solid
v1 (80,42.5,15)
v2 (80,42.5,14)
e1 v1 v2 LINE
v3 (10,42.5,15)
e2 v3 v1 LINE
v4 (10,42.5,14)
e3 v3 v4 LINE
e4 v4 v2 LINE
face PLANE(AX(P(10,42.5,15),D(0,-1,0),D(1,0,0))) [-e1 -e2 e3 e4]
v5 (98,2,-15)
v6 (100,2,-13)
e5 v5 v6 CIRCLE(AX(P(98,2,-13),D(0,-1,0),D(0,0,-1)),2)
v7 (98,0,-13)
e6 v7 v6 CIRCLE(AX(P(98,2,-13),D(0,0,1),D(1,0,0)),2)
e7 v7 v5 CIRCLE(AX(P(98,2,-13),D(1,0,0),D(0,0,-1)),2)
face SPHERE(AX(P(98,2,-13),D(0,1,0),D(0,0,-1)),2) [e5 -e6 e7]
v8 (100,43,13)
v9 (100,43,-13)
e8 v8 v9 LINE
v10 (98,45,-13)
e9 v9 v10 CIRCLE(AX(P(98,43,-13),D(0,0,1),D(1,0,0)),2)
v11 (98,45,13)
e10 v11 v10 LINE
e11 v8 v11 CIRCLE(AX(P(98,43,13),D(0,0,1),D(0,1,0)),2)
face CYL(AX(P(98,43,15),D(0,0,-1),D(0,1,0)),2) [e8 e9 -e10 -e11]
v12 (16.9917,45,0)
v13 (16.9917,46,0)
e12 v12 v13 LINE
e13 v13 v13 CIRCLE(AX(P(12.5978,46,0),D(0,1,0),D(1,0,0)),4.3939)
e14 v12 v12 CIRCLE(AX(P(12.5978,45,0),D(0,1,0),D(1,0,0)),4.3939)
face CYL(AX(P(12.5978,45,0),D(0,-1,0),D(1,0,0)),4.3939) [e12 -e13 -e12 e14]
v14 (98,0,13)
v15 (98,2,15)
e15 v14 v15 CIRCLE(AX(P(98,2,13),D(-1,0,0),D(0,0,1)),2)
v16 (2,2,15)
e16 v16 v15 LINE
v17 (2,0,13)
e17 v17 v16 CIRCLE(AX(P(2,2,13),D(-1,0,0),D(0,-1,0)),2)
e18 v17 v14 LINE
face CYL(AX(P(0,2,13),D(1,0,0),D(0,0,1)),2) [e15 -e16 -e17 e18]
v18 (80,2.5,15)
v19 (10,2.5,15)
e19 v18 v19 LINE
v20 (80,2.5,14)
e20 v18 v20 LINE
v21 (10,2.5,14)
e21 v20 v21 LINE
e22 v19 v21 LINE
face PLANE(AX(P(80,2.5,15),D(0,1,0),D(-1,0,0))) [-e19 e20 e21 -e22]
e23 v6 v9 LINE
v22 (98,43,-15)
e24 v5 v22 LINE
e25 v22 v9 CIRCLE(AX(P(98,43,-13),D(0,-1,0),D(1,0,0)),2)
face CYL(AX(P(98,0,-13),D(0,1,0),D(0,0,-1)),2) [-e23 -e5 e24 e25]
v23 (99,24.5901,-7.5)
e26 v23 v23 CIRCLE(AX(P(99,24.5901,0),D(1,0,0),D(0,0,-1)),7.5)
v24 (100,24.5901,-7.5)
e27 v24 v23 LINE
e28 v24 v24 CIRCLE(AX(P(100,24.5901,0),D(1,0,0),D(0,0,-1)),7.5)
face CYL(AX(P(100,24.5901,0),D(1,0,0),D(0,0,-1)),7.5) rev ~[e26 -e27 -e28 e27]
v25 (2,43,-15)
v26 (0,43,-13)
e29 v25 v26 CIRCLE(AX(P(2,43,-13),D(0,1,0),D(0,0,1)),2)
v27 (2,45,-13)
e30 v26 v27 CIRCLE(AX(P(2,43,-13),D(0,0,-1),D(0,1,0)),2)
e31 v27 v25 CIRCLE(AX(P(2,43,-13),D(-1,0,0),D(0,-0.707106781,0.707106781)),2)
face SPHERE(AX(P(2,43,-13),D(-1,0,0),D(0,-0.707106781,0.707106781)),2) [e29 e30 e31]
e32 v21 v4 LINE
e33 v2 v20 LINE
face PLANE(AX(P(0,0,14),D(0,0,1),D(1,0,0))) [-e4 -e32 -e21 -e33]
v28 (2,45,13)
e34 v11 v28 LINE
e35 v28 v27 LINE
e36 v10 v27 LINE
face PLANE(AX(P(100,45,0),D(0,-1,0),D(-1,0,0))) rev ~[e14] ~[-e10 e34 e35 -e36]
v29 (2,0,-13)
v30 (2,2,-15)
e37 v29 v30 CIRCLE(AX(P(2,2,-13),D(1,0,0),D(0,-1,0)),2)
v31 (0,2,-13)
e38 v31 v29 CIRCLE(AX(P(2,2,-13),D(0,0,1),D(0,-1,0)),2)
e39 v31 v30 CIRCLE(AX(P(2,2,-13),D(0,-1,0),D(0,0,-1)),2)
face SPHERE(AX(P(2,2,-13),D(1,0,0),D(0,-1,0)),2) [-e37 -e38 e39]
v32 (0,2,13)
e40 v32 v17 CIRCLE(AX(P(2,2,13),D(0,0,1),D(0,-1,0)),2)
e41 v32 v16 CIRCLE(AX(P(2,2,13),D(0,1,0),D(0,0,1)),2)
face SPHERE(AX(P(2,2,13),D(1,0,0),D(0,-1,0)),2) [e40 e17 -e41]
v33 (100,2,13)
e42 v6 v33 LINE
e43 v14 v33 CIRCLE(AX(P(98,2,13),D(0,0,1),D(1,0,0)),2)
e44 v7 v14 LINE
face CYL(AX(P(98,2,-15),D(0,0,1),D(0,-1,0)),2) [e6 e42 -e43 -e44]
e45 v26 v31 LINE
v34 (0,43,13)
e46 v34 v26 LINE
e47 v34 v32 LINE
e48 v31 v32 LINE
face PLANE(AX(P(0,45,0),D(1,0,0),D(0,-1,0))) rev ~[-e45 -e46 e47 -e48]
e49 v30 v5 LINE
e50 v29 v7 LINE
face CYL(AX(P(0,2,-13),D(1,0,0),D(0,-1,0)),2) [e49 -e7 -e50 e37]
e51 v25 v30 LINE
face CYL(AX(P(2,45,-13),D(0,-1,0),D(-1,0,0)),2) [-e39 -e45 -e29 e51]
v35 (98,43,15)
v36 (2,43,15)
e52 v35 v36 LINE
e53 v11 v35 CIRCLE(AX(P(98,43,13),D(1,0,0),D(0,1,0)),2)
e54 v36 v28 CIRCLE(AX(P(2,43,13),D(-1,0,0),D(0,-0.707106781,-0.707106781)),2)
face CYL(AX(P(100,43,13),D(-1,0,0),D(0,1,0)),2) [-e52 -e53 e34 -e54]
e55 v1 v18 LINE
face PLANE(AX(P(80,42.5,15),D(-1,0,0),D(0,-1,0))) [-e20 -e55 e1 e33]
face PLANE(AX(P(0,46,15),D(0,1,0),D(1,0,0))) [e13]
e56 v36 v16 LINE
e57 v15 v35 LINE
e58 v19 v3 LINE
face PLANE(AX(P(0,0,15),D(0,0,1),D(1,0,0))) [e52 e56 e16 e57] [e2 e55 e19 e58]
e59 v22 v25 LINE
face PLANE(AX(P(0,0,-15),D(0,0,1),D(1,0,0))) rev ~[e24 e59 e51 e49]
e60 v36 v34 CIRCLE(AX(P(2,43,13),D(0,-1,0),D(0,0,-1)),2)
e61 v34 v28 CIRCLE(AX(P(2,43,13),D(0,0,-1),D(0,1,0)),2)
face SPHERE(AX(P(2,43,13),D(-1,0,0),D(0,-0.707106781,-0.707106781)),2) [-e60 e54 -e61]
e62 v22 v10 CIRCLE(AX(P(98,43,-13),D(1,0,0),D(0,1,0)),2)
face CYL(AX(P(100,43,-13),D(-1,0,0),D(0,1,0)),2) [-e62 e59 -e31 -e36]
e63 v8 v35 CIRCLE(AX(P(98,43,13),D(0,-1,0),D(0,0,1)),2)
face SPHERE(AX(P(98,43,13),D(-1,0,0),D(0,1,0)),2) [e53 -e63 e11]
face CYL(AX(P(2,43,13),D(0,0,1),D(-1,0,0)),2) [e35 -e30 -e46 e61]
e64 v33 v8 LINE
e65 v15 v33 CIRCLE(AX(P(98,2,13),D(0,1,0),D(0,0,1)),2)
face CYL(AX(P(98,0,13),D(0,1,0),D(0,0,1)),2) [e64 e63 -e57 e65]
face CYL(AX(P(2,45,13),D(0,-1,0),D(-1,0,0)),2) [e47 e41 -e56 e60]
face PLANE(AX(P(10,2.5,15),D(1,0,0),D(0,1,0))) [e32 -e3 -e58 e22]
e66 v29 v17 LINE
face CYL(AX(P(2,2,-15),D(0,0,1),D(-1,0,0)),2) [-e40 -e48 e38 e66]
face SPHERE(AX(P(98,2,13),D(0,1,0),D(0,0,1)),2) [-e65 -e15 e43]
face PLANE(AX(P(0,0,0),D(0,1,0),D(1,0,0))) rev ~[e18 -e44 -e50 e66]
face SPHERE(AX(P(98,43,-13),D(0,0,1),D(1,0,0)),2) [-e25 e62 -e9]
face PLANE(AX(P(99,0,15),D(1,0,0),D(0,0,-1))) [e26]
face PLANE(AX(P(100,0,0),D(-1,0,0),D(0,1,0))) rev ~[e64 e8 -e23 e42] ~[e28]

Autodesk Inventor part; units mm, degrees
ref_plane "YZ Plane" through (0, 0, 0) normal (1, 0, 0) x (0, 1, 0)
ref_plane "XZ Plane" through (0, 0, 0) normal (0, 1, 0) x (-1, 0, 0)
ref_plane "XY Plane" through (0, 0, 0) normal (0, 0, 1) x (1, 0, 0)
sketch "스케치1" plane through (0, 0, 0) normal (0, 0, 1) x (1, 0, 0)
  line L0 (0, 0) -> (100, 0)
  line L1 (100, 0) -> (100, 45)
  line L2 (100, 45) -> (0, 45)
  line L3 (0, 45) -> (0, 0)
  dimension "d0" = 100
  dimension "d1" = 45
extrude "돌출1" add sketch "스케치1" along normal mid plane 30
sketch "스케치2" plane through (100, 0, 15) normal (1, 0, 0) x (0, 0, -1)
  circle A0 centre (15, 24.5901) radius 7.5
  point P0 (15, 0)
  dimension "d4" = 15
extrude "돌출2" cut sketch "스케치2" against normal blind 1
sketch "스케치3" plane through (0, 0, 15) normal (0, 0, 1) x (1, 0, 0)
  line L0 (10, 42.5) -> (80, 42.5)
  line L1 (80, 42.5) -> (80, 2.5)
  line L2 (80, 2.5) -> (10, 2.5)
  line L3 (10, 2.5) -> (10, 42.5)
  line L4 (100, 45) -> (0, 45) projected
  line L5 (0, 45) -> (0, 0) projected
  dimension "d7" = 70
  dimension "d8" = 40
  dimension "d9" = 2.5
  dimension "d10" = 10
extrude "돌출3" cut sketch "스케치3" against normal blind 1
sketch "스케치4" plane through (0, 0, 14) normal (0, 0, 1) x (1, 0, 0)
  line L0 (11.7603, 30.0874) -> (53.0164, 30.0874) construction
  line L1 (53.0164, 30.0874) -> (53.0164, 23.3337) construction
  line L2 (53.0164, 23.3337) -> (11.7603, 23.3337) construction
  line L3 (11.7603, 23.3337) -> (11.7603, 30.0874) construction
  point P0 (0, 0)
sketch "스케치5" plane through (99, 24.5901, 0) normal (1, 0, 0) x (0, 0, -1)
  line L0 (-5.91, 1.6766) -> (6.6648, 1.6766) construction
  line L1 (6.6648, 1.6766) -> (6.6648, -1.7518) construction
  line L2 (6.6648, -1.7518) -> (-5.91, -1.7518) construction
  line L3 (-5.91, -1.7518) -> (-5.91, 1.6766) construction
  point P0 (0, -24.5901)
sketch "스케치6" plane through (0, 45, 15) normal (0, 1, 0) x (1, 0, 0)
  circle A0 centre (12.5978, 15) radius 4.3939
  point P0 (0, 15)
extrude "돌출4" add sketch "스케치6" along normal blind 1
sketch "스케치7" plane through (12.5978, 46, 0) normal (0, 1, 0) x (1, 0, 0)
  line L0 (-4.0633, 1.8765) -> (4.3199, 1.8765) construction
  line L1 (4.3199, 1.8765) -> (4.3199, -1.5495) construction
  line L2 (4.3199, -1.5495) -> (-4.0633, -1.5495) construction
  line L3 (-4.0633, -1.5495) -> (-4.0633, 1.8765) construction
  point P0 (-12.5978, 0)
fillet "모깎기1" radius 2 11 edges at (50, 45, 15) (100, 45, 0) (100, 22.5, 15) (100, 22.5, -15) (50, 45, -15) (50, 0, -15) (50, 0, 15) (100, 0, 0) (0, 0, 0) (0, 22.5, 15) (0, 22.5, -15)
fillet "모깎기2" radius 2 3 edges at (0, 45, 0) (0.5858, 44.4142, 14.4142) (0.5858, 44.4142, -14.4142)
properties part number "구상도"
